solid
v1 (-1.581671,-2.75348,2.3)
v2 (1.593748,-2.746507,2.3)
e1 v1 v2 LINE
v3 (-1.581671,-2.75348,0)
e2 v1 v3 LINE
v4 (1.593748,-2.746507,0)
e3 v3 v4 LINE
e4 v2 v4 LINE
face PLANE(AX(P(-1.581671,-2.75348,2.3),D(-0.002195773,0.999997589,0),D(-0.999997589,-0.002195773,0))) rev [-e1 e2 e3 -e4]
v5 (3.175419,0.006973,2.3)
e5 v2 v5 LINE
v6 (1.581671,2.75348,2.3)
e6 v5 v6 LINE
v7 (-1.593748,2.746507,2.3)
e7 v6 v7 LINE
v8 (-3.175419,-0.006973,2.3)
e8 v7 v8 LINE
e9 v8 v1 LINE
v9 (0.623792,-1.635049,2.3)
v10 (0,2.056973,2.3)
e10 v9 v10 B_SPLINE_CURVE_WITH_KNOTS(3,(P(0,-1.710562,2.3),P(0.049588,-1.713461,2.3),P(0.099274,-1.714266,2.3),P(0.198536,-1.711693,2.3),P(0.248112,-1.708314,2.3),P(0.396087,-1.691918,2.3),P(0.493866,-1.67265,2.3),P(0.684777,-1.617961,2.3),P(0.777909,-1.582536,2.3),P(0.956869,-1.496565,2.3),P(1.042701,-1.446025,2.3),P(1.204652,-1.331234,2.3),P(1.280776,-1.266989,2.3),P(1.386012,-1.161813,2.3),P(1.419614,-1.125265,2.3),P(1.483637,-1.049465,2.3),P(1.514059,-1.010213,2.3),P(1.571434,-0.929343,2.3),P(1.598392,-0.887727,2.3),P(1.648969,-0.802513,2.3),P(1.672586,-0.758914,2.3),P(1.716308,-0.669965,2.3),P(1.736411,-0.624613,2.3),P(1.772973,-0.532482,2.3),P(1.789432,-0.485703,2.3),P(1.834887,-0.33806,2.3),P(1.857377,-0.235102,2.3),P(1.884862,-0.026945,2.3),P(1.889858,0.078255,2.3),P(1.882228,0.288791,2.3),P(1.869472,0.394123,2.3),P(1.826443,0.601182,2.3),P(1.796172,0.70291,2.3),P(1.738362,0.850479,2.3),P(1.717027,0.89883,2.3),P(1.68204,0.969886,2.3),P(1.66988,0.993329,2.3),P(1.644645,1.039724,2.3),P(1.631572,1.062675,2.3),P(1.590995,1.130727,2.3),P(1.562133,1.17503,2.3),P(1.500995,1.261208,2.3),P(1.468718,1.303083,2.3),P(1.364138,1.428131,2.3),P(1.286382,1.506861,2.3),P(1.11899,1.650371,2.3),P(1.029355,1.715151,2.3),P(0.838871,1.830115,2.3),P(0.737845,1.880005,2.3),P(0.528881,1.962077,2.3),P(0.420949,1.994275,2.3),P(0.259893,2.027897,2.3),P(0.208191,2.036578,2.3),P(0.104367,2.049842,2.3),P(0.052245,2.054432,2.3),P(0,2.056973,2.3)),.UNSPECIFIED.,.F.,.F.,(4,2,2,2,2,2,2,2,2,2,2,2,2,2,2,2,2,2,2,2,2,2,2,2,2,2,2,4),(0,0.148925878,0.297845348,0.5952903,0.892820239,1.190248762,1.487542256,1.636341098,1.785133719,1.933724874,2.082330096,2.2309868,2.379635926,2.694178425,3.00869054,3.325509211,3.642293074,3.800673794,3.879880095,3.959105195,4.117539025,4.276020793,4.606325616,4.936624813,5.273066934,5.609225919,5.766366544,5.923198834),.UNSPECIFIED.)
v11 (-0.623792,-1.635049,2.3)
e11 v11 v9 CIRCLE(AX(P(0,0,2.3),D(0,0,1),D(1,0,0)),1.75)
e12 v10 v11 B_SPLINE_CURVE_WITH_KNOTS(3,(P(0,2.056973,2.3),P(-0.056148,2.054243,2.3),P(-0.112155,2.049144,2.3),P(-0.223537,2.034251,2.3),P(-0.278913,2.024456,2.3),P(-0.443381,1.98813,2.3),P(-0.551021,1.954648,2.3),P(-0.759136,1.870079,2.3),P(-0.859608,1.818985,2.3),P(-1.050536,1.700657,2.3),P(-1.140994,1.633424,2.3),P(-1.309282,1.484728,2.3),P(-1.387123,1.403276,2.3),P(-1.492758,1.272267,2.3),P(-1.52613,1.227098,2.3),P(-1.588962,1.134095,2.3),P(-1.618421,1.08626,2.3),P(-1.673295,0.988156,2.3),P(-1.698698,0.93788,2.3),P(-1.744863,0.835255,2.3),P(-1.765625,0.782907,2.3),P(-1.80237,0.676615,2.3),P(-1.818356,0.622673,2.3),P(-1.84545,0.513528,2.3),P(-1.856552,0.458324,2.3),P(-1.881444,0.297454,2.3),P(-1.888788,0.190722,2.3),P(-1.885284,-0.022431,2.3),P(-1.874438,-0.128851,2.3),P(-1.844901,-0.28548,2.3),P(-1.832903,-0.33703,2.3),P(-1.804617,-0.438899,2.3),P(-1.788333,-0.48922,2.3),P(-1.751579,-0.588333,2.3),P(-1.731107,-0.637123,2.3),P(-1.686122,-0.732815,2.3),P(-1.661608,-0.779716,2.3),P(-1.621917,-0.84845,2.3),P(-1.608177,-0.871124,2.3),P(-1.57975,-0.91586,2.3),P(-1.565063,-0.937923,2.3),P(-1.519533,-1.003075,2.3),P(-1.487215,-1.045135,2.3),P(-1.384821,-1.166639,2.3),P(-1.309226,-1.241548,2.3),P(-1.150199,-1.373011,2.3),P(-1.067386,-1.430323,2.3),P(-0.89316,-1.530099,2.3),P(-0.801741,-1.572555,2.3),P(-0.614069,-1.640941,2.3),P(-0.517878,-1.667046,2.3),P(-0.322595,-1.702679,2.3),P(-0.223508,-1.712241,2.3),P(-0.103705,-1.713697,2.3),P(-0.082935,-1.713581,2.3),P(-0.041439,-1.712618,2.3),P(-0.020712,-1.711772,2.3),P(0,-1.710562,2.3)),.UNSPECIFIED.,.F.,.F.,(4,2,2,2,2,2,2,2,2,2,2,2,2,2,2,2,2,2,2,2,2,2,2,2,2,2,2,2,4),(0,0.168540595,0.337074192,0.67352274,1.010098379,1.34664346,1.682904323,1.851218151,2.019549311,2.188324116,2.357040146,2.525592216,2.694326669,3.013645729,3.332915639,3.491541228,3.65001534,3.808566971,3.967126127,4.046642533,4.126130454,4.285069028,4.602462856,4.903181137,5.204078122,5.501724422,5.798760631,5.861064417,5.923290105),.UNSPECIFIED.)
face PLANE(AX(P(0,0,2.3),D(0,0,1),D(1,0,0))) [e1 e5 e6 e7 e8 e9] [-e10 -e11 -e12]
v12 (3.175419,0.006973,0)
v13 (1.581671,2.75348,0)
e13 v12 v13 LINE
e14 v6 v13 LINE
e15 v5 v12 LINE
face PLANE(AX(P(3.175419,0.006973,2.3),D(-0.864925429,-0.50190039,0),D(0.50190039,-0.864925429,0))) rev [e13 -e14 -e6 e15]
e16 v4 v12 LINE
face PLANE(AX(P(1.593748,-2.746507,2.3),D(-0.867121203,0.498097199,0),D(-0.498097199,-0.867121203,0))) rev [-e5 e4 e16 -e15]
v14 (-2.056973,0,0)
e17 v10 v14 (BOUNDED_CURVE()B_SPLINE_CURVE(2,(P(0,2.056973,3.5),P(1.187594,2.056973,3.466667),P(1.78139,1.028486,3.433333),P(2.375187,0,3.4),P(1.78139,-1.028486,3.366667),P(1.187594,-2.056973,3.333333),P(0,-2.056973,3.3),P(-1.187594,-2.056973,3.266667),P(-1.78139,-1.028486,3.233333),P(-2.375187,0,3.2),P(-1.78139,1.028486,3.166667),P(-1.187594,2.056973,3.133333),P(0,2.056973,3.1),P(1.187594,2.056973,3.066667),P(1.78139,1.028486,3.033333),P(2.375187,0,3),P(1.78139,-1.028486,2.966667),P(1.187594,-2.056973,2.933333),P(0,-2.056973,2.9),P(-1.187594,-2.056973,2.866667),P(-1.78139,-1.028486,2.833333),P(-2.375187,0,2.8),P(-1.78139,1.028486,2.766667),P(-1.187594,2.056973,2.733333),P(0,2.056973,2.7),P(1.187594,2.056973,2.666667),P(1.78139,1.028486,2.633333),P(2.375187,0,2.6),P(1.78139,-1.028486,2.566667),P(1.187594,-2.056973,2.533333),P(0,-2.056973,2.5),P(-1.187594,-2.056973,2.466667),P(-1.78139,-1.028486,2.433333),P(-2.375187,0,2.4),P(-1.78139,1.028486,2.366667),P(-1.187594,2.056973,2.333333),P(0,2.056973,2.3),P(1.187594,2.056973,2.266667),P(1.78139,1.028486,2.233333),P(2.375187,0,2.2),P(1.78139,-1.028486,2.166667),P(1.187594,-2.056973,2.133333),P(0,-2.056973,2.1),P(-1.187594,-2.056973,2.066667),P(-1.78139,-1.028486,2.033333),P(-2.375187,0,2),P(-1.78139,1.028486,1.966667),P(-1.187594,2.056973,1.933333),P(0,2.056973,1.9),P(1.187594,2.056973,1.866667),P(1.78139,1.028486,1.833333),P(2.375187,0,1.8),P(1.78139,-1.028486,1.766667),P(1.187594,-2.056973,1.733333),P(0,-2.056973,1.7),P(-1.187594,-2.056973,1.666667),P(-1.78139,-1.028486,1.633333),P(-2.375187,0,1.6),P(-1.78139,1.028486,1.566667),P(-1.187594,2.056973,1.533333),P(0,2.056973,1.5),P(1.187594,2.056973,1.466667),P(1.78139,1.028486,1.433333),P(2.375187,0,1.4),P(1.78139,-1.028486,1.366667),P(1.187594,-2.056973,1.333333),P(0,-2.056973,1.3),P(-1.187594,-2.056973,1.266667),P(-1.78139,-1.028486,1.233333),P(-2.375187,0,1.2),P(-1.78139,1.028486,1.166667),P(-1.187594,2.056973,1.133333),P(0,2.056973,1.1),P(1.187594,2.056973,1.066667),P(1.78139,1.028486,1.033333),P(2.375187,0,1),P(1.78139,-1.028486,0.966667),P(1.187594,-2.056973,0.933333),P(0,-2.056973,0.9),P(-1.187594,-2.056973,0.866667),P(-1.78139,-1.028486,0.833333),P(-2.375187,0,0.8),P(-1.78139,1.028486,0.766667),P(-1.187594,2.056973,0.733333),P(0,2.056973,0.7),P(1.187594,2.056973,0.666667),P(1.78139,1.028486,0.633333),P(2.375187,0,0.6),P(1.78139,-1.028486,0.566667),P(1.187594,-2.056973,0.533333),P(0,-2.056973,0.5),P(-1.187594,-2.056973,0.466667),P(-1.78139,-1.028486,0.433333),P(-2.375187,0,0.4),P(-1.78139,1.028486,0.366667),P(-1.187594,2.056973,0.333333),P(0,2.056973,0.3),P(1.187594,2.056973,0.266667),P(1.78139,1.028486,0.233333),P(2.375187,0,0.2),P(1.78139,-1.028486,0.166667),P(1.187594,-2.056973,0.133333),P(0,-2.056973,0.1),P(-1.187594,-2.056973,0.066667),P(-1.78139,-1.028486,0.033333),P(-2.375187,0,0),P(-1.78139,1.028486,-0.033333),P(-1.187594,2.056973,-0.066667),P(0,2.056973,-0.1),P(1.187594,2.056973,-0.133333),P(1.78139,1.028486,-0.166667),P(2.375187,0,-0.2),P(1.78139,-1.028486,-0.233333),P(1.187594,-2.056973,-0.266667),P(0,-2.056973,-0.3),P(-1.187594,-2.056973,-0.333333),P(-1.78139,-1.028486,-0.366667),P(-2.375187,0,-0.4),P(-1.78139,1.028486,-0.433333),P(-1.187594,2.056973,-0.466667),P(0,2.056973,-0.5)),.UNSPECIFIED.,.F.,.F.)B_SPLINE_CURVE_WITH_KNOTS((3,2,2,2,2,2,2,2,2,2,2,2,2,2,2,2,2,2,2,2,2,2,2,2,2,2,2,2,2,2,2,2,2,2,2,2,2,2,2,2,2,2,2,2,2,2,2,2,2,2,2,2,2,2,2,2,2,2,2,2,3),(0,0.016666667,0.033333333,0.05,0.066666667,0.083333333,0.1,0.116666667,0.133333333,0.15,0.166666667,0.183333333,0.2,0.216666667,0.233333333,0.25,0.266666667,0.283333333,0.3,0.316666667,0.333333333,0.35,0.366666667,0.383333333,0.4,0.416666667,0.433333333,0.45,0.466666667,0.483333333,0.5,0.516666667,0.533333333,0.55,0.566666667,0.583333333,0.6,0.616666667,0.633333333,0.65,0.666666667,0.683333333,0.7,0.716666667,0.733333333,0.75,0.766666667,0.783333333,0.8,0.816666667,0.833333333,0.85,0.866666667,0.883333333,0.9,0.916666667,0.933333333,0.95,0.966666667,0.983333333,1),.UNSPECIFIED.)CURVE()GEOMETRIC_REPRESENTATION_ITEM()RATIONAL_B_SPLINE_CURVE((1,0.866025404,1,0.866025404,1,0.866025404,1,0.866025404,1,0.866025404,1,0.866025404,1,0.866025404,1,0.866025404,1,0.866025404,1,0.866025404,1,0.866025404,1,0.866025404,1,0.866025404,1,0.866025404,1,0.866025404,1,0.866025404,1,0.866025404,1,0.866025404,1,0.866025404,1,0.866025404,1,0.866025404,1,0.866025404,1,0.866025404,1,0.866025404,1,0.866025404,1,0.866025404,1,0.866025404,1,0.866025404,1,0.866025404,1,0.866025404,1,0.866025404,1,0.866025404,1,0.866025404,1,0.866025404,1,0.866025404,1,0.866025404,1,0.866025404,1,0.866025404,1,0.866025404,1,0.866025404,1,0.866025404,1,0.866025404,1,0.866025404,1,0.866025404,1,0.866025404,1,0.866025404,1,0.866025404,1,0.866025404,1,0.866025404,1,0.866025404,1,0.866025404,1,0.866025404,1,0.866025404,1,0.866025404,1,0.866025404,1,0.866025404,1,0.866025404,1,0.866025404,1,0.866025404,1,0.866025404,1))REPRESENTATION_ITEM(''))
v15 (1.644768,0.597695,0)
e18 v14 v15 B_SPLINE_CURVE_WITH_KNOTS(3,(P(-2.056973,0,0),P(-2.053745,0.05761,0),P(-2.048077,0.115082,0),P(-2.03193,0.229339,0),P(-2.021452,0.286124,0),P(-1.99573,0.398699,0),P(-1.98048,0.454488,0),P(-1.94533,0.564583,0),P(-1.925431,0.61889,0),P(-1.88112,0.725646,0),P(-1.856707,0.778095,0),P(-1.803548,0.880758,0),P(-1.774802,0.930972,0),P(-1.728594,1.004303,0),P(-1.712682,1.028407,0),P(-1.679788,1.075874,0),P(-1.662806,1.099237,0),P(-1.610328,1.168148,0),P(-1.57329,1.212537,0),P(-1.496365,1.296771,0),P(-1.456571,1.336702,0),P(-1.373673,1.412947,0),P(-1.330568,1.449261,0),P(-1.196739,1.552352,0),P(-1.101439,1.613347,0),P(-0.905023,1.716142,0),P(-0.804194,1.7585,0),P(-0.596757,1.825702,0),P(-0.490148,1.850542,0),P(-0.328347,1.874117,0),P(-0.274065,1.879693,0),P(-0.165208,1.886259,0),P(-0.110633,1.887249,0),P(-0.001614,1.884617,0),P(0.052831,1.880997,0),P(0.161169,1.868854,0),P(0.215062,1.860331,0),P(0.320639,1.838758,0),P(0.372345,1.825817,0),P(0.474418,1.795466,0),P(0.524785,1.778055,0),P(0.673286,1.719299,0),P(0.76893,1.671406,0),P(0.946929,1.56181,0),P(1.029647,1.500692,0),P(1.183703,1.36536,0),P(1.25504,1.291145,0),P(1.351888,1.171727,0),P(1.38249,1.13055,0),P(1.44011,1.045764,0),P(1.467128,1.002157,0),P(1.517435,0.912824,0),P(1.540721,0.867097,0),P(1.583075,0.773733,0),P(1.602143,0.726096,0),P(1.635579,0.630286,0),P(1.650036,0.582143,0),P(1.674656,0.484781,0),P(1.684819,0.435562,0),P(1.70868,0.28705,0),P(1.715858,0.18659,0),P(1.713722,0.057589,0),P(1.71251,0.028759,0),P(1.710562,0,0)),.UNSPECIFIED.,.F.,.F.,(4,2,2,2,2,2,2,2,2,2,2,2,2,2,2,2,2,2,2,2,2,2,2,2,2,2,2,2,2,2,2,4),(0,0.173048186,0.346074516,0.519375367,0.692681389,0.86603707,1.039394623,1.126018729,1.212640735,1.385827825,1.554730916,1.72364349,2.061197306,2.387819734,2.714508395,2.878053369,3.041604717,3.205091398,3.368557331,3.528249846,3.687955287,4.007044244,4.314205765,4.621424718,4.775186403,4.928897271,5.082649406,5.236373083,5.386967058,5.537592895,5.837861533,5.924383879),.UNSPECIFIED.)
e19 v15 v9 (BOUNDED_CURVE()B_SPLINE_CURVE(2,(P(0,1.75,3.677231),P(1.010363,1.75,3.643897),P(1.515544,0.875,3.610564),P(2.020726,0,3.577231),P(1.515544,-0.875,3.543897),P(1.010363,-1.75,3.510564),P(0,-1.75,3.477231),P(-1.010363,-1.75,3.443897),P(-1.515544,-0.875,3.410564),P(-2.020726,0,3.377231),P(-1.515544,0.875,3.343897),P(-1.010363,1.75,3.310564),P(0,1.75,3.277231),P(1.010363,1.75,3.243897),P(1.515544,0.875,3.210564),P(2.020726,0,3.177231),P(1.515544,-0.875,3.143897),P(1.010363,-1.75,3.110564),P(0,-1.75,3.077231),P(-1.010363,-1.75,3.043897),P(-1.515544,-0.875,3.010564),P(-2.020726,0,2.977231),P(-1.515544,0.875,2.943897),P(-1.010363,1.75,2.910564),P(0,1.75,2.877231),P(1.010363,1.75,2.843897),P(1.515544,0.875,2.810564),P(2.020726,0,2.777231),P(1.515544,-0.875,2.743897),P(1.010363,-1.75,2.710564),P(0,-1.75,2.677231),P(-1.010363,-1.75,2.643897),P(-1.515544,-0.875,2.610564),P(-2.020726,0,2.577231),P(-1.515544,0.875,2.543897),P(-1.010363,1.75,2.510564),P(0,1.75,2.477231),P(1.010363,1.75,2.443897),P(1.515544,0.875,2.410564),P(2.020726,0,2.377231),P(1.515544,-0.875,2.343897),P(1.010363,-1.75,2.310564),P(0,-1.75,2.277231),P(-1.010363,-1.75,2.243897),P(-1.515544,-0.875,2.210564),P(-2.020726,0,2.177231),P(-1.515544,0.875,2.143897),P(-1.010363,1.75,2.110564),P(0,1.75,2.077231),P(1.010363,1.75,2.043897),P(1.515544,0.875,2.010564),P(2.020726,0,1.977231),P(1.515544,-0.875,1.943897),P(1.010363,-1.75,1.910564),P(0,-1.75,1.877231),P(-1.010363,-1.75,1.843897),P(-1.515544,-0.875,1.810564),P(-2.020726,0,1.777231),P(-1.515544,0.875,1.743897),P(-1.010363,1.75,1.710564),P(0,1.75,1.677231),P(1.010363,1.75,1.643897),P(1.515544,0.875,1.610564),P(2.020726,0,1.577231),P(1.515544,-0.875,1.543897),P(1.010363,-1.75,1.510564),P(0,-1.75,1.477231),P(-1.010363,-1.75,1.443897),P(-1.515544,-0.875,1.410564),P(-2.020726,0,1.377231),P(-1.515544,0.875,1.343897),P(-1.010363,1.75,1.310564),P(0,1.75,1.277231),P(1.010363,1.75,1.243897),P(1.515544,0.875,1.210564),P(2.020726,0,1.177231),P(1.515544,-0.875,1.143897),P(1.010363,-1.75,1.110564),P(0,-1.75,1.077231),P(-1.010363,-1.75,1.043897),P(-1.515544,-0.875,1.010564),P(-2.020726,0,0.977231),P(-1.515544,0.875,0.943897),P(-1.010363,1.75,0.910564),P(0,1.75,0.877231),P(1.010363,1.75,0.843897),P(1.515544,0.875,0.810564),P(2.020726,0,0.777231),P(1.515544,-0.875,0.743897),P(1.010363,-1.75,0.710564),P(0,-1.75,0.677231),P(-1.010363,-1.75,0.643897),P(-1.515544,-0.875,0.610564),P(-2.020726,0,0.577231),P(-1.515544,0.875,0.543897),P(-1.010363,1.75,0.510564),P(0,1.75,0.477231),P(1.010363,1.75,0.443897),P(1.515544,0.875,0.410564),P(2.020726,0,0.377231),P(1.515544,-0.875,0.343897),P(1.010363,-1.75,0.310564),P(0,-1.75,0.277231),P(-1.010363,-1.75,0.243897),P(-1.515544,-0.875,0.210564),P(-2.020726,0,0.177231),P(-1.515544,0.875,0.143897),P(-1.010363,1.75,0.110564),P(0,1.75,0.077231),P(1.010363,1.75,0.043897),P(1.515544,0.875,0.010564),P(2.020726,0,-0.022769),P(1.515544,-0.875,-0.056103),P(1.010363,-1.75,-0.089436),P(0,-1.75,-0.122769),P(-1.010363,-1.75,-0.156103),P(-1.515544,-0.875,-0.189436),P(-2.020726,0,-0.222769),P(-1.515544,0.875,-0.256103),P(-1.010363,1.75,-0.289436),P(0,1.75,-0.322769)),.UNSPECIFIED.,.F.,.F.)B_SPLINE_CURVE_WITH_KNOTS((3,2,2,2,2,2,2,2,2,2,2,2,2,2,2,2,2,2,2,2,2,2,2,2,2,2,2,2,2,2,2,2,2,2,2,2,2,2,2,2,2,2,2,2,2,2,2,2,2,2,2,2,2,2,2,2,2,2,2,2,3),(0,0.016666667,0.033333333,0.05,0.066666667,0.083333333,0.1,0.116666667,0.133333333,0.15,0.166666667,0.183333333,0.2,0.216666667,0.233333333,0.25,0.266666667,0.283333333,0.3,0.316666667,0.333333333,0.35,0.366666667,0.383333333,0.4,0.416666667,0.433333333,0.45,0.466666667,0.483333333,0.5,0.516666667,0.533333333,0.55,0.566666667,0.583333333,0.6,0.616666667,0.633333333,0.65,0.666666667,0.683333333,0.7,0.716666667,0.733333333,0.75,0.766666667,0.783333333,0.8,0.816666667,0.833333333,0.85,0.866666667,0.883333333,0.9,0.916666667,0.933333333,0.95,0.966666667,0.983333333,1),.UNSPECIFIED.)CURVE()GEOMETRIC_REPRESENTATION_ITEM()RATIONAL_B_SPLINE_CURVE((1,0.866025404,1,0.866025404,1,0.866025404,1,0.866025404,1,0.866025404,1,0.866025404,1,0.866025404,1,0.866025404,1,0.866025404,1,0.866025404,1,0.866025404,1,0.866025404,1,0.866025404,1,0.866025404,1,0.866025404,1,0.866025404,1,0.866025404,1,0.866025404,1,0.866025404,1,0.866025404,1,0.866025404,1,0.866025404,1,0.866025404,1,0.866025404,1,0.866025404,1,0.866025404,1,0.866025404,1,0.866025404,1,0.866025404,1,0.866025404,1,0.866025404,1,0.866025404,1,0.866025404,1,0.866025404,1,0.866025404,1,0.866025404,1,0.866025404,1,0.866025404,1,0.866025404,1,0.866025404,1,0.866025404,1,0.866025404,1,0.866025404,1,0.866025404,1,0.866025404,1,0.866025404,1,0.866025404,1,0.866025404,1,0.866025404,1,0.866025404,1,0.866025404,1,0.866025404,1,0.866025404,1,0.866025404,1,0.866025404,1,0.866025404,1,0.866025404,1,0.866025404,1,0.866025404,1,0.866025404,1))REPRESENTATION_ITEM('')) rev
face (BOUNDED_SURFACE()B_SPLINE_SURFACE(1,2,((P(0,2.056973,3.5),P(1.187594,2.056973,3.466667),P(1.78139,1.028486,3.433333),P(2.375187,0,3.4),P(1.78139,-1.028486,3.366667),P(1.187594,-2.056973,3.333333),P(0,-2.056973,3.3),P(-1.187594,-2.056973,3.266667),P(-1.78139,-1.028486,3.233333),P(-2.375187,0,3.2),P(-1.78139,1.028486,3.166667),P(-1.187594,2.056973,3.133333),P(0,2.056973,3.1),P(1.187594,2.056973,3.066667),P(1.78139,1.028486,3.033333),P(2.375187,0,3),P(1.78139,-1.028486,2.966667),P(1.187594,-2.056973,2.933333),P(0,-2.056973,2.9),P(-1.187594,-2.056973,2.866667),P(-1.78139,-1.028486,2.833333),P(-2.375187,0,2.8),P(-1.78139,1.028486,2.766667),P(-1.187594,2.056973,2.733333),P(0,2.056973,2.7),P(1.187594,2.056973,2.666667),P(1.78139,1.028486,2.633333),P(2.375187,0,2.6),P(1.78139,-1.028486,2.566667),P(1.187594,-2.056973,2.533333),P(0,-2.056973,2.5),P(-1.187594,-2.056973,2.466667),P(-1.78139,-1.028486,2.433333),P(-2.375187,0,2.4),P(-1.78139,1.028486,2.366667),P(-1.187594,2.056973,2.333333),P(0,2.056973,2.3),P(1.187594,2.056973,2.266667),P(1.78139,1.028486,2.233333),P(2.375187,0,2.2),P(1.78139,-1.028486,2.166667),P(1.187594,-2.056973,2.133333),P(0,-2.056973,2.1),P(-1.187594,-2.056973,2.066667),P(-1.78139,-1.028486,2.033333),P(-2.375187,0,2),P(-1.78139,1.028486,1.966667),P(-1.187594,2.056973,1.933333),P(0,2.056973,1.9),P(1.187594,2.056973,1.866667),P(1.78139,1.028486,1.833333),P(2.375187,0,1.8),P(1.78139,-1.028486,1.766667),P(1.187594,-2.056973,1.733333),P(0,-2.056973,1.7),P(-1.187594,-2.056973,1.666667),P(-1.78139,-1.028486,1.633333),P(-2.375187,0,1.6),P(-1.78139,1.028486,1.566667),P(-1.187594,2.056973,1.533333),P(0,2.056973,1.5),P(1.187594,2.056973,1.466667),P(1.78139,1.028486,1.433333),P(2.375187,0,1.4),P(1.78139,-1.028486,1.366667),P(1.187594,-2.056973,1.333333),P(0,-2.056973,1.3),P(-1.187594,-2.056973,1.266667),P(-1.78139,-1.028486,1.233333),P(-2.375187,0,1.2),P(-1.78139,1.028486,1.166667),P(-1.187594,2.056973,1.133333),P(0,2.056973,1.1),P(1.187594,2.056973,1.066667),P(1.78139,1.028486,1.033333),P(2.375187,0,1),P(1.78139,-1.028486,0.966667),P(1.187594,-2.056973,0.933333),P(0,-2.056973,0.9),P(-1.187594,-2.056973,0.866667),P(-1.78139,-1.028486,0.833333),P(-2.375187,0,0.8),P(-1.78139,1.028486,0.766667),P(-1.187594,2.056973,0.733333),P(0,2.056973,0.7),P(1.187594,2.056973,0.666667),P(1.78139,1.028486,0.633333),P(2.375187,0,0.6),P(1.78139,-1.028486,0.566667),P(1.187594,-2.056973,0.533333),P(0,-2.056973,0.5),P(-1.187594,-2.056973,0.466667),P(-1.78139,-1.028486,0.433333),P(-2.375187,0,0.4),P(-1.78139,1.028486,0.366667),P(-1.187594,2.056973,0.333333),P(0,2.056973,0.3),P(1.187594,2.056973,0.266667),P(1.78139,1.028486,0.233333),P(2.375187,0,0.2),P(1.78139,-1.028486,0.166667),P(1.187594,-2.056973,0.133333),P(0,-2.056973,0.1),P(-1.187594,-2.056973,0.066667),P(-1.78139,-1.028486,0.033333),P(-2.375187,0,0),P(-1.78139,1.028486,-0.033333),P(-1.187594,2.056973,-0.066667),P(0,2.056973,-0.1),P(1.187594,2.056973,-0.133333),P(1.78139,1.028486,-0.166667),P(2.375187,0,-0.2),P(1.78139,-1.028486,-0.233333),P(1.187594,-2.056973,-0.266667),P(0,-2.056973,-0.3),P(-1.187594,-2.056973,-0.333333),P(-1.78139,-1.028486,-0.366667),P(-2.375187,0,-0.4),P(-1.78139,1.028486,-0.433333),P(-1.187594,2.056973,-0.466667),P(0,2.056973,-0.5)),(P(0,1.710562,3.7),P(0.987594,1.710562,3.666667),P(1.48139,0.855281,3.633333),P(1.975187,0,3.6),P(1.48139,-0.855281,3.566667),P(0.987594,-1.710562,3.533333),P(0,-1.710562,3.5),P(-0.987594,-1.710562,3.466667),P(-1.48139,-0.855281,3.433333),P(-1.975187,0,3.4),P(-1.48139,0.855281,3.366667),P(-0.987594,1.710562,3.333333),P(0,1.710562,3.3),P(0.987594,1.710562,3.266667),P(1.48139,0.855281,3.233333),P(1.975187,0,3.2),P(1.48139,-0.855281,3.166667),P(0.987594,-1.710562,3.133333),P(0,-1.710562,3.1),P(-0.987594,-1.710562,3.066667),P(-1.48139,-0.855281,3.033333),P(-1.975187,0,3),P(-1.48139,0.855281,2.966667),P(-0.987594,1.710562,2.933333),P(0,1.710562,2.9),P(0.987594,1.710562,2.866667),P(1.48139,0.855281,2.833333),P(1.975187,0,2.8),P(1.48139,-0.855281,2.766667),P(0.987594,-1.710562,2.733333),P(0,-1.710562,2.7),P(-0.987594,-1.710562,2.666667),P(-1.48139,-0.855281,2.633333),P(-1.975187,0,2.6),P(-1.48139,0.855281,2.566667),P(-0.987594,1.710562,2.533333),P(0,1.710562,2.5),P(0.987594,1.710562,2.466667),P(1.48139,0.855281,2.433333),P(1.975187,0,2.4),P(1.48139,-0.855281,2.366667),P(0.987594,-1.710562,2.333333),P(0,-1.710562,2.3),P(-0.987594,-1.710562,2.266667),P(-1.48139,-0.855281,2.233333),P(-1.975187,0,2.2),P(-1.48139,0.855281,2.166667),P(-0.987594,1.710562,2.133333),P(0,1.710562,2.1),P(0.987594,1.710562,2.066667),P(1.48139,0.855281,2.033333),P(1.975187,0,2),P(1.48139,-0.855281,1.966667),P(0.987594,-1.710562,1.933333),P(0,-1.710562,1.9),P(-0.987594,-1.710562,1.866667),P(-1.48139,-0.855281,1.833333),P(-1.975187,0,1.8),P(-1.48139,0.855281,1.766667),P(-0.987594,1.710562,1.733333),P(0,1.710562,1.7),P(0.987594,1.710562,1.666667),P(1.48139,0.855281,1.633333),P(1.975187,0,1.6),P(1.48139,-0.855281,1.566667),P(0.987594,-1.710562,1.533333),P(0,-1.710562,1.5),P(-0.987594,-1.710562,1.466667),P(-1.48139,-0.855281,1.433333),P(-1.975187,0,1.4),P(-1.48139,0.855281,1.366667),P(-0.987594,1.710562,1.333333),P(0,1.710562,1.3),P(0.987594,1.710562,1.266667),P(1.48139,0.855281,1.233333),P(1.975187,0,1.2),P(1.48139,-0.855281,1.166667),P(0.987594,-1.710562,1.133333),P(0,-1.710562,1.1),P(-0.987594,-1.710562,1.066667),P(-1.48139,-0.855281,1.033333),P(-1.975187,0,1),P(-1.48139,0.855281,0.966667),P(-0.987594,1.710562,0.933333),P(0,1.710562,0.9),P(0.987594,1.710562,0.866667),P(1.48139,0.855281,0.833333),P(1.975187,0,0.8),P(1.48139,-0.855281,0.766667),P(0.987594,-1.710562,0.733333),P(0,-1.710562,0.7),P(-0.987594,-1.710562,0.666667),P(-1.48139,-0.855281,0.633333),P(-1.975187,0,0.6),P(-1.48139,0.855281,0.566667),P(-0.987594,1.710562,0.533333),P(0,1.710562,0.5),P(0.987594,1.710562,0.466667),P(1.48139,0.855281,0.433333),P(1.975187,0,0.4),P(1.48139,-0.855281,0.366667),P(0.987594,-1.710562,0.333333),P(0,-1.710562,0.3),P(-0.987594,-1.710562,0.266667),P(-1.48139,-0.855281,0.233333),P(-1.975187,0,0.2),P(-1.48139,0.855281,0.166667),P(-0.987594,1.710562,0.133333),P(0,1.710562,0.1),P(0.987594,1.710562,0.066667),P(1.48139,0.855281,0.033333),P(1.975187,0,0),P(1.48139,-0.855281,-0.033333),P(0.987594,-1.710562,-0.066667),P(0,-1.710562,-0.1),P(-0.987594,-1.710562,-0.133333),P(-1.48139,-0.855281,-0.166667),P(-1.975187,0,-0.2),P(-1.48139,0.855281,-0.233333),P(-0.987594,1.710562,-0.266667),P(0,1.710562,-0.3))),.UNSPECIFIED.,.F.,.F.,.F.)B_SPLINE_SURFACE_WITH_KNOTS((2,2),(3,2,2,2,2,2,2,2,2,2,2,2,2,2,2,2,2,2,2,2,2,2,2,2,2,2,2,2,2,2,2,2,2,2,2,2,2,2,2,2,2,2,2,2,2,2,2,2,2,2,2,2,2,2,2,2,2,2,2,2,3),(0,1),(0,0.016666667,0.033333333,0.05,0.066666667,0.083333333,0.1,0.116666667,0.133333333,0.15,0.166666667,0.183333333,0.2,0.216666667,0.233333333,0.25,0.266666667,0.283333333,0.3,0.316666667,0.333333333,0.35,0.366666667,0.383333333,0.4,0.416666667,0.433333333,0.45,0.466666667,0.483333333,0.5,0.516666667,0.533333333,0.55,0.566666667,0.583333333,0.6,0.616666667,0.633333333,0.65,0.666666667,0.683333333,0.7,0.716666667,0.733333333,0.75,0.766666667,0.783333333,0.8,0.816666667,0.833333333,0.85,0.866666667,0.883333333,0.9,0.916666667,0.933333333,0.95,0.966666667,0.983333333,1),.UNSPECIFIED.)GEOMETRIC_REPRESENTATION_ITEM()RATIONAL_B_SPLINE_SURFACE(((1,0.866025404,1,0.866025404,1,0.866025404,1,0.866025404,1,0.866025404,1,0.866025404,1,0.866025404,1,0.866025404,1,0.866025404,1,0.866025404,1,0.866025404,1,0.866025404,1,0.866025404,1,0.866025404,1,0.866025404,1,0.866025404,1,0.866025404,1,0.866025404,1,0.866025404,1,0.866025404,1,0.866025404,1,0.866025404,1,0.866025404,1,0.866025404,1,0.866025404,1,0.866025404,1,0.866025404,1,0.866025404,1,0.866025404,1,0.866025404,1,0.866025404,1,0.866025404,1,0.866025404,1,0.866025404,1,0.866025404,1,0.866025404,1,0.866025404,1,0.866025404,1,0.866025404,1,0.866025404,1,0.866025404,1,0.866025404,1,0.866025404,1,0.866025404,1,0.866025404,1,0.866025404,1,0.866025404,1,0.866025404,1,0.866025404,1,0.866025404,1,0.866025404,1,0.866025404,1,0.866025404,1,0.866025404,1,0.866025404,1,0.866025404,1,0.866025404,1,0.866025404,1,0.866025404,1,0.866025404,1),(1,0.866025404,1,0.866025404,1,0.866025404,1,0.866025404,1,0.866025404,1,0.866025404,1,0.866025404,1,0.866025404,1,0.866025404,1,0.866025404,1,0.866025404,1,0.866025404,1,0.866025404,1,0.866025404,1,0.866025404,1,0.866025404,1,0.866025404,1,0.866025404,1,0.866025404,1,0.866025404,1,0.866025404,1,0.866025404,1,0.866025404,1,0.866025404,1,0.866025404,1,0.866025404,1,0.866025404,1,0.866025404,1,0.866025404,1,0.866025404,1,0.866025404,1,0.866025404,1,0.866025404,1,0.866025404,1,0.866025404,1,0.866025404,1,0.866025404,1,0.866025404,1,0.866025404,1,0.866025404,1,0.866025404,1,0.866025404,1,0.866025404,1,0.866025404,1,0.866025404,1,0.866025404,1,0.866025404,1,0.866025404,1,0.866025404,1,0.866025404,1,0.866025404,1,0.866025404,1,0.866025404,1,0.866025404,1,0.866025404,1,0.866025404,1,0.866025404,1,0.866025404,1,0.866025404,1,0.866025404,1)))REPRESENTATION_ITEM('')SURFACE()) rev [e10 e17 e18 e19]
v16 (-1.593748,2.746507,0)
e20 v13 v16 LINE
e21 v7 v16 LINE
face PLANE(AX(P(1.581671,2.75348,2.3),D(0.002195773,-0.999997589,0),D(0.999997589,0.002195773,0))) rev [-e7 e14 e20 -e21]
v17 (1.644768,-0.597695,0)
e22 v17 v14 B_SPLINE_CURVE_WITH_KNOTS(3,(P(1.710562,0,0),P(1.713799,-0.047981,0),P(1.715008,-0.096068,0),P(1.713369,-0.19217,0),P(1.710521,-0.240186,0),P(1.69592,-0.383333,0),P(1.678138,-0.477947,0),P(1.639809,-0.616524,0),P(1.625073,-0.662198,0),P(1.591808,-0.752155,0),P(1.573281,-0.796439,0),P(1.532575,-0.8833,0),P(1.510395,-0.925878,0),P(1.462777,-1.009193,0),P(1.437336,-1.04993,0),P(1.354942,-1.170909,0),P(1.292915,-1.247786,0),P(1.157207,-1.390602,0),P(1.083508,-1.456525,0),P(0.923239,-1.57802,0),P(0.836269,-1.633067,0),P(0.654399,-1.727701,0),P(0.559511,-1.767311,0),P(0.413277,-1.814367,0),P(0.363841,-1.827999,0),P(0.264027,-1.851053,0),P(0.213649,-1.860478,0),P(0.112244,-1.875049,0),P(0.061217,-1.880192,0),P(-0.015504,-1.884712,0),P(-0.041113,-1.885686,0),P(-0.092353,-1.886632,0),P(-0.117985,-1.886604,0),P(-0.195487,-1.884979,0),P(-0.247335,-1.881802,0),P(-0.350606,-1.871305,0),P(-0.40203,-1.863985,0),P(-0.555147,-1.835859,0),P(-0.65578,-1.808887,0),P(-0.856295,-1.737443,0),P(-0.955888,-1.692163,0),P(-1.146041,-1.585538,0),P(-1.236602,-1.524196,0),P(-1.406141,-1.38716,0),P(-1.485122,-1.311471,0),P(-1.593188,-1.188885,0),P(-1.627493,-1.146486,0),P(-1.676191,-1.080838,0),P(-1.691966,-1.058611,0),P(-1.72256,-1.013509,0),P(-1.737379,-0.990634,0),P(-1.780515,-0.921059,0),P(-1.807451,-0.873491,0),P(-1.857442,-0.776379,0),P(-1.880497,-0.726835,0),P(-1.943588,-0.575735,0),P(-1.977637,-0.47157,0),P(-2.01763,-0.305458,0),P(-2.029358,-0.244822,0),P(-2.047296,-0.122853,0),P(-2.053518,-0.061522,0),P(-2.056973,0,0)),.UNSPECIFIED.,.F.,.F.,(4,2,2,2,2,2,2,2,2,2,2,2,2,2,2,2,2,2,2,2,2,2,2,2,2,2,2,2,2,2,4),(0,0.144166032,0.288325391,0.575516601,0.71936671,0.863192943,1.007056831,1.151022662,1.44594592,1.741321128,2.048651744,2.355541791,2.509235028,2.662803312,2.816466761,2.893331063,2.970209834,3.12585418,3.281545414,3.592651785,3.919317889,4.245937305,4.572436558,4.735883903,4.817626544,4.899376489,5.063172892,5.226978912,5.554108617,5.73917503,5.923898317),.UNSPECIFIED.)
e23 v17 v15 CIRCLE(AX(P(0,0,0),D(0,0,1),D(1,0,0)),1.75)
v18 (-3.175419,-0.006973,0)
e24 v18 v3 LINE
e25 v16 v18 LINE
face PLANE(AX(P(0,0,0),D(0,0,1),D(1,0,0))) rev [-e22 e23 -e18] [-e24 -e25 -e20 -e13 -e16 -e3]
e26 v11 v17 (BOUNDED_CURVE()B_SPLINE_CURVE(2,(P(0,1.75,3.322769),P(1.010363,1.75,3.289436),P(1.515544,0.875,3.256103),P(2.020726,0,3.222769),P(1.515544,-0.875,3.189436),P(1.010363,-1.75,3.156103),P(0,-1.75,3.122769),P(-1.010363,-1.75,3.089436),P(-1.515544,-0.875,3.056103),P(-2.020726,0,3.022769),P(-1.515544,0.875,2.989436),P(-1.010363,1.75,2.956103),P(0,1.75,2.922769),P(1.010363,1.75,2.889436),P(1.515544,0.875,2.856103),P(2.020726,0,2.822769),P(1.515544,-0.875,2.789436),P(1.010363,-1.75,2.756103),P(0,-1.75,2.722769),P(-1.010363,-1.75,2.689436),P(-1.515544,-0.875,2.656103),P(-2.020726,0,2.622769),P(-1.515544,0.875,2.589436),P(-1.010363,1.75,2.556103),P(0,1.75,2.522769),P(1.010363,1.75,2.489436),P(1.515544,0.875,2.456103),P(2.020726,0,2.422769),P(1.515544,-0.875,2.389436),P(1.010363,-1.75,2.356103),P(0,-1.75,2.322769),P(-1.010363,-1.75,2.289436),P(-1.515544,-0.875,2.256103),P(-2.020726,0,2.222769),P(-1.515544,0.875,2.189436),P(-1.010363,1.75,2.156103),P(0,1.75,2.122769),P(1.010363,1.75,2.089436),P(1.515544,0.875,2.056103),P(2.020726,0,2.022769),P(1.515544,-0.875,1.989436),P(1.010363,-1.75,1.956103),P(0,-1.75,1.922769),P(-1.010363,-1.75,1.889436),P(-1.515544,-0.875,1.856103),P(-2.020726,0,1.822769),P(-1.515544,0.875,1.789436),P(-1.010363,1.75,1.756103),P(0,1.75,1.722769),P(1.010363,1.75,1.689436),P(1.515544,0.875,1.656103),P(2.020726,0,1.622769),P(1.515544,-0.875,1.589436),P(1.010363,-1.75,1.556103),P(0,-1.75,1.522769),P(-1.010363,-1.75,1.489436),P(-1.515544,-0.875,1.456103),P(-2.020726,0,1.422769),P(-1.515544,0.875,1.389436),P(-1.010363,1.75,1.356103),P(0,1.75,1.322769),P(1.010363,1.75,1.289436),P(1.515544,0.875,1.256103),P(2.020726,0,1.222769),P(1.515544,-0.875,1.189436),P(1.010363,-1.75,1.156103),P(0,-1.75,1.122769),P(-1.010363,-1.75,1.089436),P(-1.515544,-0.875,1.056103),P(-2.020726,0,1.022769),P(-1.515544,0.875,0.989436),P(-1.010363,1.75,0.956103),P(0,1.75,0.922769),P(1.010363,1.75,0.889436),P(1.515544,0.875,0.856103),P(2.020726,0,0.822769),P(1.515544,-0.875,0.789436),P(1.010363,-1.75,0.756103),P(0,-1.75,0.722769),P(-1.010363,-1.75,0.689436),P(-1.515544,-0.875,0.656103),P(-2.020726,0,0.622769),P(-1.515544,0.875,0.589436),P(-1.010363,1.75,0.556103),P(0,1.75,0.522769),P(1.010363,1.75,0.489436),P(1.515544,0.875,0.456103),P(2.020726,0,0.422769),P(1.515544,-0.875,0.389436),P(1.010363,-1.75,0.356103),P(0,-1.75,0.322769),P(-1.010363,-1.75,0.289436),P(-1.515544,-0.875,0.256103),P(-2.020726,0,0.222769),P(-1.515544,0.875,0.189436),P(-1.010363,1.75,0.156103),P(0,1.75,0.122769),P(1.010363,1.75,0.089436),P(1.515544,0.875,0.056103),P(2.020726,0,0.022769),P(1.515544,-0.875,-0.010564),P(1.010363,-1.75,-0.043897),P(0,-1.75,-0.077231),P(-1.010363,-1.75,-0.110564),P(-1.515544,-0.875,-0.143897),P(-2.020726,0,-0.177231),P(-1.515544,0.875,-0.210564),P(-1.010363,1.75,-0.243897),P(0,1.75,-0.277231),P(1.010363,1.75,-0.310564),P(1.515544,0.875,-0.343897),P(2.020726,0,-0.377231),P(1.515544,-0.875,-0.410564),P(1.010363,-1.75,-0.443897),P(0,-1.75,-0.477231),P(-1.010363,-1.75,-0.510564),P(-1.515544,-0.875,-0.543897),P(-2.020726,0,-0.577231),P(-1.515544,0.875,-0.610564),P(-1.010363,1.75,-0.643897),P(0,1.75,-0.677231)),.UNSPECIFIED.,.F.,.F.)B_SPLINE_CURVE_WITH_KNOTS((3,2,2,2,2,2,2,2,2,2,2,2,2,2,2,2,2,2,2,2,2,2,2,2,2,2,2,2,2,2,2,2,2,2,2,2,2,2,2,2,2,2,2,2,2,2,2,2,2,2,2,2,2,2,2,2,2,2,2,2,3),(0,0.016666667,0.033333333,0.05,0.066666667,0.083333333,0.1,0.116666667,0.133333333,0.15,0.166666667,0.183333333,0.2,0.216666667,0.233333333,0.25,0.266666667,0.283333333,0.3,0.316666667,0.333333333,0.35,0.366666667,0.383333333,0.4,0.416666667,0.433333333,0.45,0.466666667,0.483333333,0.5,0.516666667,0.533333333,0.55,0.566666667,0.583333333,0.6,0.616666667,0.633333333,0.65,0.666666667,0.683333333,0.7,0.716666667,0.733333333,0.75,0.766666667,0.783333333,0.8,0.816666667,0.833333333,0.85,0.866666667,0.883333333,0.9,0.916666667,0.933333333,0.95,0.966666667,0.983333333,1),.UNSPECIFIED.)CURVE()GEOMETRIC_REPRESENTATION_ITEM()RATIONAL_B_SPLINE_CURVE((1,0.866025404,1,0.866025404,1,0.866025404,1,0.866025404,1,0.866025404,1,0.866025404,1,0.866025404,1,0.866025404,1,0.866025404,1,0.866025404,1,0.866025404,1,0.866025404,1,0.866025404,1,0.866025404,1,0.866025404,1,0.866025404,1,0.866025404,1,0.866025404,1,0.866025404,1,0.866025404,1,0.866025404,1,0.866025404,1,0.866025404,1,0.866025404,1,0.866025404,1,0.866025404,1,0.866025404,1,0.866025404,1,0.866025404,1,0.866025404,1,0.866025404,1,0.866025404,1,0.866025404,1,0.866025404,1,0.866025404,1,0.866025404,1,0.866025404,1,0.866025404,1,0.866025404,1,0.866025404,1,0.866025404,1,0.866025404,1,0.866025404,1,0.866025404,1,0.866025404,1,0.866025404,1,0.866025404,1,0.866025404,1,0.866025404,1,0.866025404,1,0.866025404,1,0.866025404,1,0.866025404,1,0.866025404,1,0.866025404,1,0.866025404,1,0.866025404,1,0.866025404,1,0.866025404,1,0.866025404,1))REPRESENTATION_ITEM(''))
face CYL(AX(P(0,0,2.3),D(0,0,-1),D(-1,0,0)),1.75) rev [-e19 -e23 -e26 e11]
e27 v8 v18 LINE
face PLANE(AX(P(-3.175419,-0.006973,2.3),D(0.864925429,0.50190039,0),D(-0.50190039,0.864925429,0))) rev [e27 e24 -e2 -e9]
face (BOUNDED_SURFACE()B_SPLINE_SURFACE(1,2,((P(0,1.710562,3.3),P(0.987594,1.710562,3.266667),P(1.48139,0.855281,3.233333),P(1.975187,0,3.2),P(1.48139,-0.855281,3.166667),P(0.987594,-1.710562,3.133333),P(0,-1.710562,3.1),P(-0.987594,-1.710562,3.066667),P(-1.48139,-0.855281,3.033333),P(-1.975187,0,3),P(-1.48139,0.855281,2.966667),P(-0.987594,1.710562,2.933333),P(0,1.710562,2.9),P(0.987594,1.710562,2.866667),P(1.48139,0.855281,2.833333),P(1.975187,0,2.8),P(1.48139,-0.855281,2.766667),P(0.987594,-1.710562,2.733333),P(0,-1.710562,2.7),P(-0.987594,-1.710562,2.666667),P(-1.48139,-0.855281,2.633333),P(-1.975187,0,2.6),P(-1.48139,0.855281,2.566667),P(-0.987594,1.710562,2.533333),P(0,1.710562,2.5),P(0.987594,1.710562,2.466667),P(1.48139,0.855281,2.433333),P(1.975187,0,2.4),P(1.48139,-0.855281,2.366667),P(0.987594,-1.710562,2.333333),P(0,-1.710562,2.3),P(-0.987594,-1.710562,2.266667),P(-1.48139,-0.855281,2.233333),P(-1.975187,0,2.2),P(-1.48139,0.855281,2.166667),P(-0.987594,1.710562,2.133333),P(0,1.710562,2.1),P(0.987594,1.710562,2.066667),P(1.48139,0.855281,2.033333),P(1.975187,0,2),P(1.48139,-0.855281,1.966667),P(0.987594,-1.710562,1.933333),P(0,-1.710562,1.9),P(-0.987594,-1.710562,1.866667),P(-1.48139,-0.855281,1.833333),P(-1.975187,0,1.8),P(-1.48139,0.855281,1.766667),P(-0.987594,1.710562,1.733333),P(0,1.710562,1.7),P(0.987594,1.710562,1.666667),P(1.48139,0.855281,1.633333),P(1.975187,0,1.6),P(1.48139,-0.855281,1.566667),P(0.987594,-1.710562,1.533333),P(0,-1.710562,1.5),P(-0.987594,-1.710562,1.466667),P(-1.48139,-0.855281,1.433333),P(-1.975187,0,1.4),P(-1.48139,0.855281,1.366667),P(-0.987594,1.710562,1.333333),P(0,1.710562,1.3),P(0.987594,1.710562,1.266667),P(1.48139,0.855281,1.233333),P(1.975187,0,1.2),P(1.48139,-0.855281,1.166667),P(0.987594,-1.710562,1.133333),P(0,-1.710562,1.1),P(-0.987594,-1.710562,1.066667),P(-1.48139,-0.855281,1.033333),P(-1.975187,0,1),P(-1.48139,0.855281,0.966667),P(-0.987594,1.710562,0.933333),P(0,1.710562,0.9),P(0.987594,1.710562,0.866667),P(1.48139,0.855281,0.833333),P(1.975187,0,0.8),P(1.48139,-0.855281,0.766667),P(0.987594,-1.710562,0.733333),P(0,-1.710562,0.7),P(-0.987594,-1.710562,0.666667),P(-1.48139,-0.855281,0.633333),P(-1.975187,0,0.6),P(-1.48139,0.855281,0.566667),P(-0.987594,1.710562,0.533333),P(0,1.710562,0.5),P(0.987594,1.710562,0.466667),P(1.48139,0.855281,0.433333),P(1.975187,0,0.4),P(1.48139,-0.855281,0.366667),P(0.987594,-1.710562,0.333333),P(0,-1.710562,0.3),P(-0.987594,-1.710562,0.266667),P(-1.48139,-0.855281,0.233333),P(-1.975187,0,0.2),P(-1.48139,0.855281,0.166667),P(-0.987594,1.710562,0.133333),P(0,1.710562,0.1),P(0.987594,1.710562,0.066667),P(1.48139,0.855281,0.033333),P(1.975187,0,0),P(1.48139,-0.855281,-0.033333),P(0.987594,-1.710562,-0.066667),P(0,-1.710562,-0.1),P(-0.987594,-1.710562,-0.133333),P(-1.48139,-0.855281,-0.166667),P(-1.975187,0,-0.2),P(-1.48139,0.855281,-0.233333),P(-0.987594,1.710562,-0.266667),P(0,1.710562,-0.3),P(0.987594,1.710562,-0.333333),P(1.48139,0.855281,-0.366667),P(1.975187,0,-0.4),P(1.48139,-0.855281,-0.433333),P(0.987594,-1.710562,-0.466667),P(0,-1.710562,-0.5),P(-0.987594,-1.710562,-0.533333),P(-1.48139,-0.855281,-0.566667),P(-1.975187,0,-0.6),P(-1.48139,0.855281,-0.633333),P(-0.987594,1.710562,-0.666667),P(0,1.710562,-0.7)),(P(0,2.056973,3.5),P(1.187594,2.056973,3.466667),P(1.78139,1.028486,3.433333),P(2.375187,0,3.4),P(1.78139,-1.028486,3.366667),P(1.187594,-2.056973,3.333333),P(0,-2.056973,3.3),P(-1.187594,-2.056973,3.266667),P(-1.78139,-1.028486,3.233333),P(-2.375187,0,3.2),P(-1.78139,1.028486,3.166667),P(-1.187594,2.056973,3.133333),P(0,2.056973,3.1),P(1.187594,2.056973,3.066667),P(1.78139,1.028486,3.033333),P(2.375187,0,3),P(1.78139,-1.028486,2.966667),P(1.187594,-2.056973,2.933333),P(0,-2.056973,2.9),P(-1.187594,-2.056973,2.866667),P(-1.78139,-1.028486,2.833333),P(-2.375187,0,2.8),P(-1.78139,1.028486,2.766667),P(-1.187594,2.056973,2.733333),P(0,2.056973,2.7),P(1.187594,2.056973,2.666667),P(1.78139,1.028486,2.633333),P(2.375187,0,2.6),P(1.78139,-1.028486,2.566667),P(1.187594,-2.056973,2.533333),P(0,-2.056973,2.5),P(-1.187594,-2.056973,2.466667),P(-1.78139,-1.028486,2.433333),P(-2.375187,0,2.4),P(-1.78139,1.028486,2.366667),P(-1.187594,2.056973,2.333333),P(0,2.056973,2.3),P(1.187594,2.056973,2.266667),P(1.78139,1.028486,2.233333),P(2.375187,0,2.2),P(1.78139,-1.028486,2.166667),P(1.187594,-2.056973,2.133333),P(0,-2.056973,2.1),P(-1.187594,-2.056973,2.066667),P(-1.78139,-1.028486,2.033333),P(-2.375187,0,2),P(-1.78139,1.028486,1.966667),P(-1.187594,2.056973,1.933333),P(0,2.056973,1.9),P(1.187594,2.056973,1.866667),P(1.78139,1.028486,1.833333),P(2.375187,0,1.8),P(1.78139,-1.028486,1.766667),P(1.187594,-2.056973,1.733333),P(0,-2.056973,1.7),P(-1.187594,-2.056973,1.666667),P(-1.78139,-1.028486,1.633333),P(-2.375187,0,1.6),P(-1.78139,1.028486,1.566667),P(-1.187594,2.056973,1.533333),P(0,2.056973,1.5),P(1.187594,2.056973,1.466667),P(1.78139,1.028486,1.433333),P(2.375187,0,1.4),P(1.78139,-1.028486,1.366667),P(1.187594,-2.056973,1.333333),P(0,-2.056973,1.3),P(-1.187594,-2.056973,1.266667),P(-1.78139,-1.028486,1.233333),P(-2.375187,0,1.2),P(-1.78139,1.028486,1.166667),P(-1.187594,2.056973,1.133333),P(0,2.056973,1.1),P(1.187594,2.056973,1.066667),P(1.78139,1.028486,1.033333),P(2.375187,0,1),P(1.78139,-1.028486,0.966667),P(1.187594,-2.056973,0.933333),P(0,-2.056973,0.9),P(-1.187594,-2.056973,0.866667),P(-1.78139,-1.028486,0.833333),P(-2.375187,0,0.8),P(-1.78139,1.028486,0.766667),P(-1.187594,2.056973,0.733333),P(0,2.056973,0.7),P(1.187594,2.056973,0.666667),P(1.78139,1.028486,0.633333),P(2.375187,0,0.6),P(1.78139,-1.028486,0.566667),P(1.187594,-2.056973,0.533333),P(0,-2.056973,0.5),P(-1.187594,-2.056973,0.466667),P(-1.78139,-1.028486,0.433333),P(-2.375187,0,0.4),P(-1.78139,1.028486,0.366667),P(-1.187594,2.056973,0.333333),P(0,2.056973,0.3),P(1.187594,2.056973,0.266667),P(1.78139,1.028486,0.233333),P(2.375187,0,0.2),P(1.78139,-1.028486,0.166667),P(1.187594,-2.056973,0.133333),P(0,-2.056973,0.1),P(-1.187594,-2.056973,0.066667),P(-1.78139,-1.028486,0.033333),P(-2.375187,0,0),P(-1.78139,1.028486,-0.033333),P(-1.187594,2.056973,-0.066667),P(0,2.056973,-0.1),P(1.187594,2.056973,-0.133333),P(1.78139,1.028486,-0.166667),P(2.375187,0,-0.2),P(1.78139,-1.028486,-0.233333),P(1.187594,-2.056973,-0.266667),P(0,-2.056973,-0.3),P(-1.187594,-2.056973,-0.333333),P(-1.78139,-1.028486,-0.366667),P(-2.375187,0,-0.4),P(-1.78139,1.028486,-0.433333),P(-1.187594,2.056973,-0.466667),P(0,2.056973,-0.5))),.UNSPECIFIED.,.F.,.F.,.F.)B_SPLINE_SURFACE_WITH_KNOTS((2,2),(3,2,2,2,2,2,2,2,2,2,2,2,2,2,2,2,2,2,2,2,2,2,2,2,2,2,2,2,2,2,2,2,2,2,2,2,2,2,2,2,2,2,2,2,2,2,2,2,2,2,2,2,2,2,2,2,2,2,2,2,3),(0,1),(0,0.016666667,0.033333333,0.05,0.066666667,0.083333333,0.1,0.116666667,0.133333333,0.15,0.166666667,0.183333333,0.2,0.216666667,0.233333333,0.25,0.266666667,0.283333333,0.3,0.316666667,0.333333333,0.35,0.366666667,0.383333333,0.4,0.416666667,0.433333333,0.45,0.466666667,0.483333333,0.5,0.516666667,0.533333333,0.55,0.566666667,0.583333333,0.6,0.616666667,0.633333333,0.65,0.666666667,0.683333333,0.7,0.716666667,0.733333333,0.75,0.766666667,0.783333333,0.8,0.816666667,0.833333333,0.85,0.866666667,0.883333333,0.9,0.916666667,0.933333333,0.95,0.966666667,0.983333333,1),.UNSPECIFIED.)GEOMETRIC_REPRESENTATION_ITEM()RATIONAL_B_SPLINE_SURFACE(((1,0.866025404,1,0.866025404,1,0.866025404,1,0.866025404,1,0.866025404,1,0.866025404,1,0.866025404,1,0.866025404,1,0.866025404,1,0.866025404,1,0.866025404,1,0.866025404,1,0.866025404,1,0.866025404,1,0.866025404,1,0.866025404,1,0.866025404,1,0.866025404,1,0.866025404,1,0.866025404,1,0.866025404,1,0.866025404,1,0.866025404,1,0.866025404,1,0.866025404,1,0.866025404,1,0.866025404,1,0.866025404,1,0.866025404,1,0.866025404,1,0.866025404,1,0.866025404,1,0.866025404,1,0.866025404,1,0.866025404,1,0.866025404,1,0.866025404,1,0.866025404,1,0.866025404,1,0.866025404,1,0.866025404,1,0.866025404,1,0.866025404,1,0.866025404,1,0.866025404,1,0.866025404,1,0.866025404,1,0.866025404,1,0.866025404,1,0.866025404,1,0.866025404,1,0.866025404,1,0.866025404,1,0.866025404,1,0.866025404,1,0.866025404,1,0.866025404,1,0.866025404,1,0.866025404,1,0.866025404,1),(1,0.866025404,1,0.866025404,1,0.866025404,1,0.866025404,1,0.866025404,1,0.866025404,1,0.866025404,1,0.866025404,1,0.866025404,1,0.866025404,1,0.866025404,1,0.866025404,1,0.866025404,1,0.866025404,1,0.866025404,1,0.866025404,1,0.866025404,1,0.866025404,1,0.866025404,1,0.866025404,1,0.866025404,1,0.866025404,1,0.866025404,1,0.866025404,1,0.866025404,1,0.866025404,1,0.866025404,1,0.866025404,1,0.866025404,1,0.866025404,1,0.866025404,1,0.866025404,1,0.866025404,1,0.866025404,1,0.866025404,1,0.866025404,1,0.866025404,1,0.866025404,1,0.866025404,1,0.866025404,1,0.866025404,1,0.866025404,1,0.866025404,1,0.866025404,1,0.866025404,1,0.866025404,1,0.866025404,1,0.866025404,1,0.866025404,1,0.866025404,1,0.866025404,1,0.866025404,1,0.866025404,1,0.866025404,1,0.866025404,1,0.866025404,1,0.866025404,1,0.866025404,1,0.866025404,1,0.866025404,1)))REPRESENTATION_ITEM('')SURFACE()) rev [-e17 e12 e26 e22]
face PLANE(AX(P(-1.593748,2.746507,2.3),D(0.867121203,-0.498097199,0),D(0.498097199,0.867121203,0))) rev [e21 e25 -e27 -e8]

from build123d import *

# Parameters (mm, degrees)
SKETCH1_R           = 1.75
BOSS_EXTRUDE1_DEPTH = 2.3
CUT_SWEEP2_PITCH    = 0.4


with BuildPart() as part:
    # Sketch1 → Boss-Extrude1 (new body)
    with BuildSketch(Plane.XY):
        Polygon((1.593747789, -2.746507112), (3.175418826, 0.006972516), (1.581671036, 2.753479629), (-1.593747789, 2.746507112), (-3.175418826, -0.006972516), (-1.581671036, -2.753479629), align=None)
        Circle(SKETCH1_R, mode=Mode.SUBTRACT)
    extrude(amount=BOSS_EXTRUDE1_DEPTH)

    # Cut-Sweep2: arcs per turn and ends read off the stored shape
    # Cut-Sweep2: the profile of Sketch9 screwed along a right-hand helix through 10 turns, 6 arcs to a turn; built about Z, then put on its axis
    cut_sweep2_z = Axis((0, 0, 0), (0, 0, 1))
    cut_sweep2_corners = [(0, -2.056972516, -0.5), (0, -1.606972516, -0.240192379), (0, -1.606972516, -0.759807621)]
    with BuildLine(mode=Mode.PRIVATE) as cut_sweep2_profile:
        Line(cut_sweep2_corners[0], cut_sweep2_corners[1])
        Line(cut_sweep2_corners[1], cut_sweep2_corners[2])
        Line(cut_sweep2_corners[2], cut_sweep2_corners[0])
    cut_sweep2_cap = Face(cut_sweep2_profile.wire())
    cut_sweep2_turn_angles = [0, 30, 60, 90, 120, 150, 180, 210, 240, 270, 300, 330, 360]
    cut_sweep2_turn_weights = [1, 0.8660254037844387, 1, 0.8660254037844387, 1, 0.8660254037844387, 1, 0.8660254037844387, 1, 0.8660254037844387, 1, 0.8660254037844387, 1]
    cut_sweep2_turn_rails = [Edge.make_bspline([Vector(p[0], p[1], 0).rotate(cut_sweep2_z, cut_sweep2_turn_angles[k]) / cut_sweep2_turn_weights[k] + Vector(0, 0, p[2] + CUT_SWEEP2_PITCH * cut_sweep2_turn_angles[k] / 360) for k in range(13)], [0, 0, 0, 1, 1, 2, 2, 3, 3, 4, 4, 5, 5, 6, 6, 6], 2, cut_sweep2_turn_weights) for p in cut_sweep2_corners]
    cut_sweep2_turn_sides = [Face.make_surface_from_curves(cut_sweep2_turn_rails[p[0]], cut_sweep2_turn_rails[p[1]]) for p in [(0, 1), (1, 2), (2, 0)]]
    cut_sweep2 = Plane(origin=(0, 0, 0), x_dir=(-1, 0, 0), z_dir=(0, 0, 1)) * Solid(Shell([*[p.moved(Location((0, 0, CUT_SWEEP2_PITCH * i))) for i in range(10) for p in cut_sweep2_turn_sides], cut_sweep2_cap, cut_sweep2_cap.rotate(cut_sweep2_z, 3600).moved(Location((0, 0, CUT_SWEEP2_PITCH * 3600 / 360)))]))
    add(cut_sweep2, mode=Mode.SUBTRACT)


solid = part.part
